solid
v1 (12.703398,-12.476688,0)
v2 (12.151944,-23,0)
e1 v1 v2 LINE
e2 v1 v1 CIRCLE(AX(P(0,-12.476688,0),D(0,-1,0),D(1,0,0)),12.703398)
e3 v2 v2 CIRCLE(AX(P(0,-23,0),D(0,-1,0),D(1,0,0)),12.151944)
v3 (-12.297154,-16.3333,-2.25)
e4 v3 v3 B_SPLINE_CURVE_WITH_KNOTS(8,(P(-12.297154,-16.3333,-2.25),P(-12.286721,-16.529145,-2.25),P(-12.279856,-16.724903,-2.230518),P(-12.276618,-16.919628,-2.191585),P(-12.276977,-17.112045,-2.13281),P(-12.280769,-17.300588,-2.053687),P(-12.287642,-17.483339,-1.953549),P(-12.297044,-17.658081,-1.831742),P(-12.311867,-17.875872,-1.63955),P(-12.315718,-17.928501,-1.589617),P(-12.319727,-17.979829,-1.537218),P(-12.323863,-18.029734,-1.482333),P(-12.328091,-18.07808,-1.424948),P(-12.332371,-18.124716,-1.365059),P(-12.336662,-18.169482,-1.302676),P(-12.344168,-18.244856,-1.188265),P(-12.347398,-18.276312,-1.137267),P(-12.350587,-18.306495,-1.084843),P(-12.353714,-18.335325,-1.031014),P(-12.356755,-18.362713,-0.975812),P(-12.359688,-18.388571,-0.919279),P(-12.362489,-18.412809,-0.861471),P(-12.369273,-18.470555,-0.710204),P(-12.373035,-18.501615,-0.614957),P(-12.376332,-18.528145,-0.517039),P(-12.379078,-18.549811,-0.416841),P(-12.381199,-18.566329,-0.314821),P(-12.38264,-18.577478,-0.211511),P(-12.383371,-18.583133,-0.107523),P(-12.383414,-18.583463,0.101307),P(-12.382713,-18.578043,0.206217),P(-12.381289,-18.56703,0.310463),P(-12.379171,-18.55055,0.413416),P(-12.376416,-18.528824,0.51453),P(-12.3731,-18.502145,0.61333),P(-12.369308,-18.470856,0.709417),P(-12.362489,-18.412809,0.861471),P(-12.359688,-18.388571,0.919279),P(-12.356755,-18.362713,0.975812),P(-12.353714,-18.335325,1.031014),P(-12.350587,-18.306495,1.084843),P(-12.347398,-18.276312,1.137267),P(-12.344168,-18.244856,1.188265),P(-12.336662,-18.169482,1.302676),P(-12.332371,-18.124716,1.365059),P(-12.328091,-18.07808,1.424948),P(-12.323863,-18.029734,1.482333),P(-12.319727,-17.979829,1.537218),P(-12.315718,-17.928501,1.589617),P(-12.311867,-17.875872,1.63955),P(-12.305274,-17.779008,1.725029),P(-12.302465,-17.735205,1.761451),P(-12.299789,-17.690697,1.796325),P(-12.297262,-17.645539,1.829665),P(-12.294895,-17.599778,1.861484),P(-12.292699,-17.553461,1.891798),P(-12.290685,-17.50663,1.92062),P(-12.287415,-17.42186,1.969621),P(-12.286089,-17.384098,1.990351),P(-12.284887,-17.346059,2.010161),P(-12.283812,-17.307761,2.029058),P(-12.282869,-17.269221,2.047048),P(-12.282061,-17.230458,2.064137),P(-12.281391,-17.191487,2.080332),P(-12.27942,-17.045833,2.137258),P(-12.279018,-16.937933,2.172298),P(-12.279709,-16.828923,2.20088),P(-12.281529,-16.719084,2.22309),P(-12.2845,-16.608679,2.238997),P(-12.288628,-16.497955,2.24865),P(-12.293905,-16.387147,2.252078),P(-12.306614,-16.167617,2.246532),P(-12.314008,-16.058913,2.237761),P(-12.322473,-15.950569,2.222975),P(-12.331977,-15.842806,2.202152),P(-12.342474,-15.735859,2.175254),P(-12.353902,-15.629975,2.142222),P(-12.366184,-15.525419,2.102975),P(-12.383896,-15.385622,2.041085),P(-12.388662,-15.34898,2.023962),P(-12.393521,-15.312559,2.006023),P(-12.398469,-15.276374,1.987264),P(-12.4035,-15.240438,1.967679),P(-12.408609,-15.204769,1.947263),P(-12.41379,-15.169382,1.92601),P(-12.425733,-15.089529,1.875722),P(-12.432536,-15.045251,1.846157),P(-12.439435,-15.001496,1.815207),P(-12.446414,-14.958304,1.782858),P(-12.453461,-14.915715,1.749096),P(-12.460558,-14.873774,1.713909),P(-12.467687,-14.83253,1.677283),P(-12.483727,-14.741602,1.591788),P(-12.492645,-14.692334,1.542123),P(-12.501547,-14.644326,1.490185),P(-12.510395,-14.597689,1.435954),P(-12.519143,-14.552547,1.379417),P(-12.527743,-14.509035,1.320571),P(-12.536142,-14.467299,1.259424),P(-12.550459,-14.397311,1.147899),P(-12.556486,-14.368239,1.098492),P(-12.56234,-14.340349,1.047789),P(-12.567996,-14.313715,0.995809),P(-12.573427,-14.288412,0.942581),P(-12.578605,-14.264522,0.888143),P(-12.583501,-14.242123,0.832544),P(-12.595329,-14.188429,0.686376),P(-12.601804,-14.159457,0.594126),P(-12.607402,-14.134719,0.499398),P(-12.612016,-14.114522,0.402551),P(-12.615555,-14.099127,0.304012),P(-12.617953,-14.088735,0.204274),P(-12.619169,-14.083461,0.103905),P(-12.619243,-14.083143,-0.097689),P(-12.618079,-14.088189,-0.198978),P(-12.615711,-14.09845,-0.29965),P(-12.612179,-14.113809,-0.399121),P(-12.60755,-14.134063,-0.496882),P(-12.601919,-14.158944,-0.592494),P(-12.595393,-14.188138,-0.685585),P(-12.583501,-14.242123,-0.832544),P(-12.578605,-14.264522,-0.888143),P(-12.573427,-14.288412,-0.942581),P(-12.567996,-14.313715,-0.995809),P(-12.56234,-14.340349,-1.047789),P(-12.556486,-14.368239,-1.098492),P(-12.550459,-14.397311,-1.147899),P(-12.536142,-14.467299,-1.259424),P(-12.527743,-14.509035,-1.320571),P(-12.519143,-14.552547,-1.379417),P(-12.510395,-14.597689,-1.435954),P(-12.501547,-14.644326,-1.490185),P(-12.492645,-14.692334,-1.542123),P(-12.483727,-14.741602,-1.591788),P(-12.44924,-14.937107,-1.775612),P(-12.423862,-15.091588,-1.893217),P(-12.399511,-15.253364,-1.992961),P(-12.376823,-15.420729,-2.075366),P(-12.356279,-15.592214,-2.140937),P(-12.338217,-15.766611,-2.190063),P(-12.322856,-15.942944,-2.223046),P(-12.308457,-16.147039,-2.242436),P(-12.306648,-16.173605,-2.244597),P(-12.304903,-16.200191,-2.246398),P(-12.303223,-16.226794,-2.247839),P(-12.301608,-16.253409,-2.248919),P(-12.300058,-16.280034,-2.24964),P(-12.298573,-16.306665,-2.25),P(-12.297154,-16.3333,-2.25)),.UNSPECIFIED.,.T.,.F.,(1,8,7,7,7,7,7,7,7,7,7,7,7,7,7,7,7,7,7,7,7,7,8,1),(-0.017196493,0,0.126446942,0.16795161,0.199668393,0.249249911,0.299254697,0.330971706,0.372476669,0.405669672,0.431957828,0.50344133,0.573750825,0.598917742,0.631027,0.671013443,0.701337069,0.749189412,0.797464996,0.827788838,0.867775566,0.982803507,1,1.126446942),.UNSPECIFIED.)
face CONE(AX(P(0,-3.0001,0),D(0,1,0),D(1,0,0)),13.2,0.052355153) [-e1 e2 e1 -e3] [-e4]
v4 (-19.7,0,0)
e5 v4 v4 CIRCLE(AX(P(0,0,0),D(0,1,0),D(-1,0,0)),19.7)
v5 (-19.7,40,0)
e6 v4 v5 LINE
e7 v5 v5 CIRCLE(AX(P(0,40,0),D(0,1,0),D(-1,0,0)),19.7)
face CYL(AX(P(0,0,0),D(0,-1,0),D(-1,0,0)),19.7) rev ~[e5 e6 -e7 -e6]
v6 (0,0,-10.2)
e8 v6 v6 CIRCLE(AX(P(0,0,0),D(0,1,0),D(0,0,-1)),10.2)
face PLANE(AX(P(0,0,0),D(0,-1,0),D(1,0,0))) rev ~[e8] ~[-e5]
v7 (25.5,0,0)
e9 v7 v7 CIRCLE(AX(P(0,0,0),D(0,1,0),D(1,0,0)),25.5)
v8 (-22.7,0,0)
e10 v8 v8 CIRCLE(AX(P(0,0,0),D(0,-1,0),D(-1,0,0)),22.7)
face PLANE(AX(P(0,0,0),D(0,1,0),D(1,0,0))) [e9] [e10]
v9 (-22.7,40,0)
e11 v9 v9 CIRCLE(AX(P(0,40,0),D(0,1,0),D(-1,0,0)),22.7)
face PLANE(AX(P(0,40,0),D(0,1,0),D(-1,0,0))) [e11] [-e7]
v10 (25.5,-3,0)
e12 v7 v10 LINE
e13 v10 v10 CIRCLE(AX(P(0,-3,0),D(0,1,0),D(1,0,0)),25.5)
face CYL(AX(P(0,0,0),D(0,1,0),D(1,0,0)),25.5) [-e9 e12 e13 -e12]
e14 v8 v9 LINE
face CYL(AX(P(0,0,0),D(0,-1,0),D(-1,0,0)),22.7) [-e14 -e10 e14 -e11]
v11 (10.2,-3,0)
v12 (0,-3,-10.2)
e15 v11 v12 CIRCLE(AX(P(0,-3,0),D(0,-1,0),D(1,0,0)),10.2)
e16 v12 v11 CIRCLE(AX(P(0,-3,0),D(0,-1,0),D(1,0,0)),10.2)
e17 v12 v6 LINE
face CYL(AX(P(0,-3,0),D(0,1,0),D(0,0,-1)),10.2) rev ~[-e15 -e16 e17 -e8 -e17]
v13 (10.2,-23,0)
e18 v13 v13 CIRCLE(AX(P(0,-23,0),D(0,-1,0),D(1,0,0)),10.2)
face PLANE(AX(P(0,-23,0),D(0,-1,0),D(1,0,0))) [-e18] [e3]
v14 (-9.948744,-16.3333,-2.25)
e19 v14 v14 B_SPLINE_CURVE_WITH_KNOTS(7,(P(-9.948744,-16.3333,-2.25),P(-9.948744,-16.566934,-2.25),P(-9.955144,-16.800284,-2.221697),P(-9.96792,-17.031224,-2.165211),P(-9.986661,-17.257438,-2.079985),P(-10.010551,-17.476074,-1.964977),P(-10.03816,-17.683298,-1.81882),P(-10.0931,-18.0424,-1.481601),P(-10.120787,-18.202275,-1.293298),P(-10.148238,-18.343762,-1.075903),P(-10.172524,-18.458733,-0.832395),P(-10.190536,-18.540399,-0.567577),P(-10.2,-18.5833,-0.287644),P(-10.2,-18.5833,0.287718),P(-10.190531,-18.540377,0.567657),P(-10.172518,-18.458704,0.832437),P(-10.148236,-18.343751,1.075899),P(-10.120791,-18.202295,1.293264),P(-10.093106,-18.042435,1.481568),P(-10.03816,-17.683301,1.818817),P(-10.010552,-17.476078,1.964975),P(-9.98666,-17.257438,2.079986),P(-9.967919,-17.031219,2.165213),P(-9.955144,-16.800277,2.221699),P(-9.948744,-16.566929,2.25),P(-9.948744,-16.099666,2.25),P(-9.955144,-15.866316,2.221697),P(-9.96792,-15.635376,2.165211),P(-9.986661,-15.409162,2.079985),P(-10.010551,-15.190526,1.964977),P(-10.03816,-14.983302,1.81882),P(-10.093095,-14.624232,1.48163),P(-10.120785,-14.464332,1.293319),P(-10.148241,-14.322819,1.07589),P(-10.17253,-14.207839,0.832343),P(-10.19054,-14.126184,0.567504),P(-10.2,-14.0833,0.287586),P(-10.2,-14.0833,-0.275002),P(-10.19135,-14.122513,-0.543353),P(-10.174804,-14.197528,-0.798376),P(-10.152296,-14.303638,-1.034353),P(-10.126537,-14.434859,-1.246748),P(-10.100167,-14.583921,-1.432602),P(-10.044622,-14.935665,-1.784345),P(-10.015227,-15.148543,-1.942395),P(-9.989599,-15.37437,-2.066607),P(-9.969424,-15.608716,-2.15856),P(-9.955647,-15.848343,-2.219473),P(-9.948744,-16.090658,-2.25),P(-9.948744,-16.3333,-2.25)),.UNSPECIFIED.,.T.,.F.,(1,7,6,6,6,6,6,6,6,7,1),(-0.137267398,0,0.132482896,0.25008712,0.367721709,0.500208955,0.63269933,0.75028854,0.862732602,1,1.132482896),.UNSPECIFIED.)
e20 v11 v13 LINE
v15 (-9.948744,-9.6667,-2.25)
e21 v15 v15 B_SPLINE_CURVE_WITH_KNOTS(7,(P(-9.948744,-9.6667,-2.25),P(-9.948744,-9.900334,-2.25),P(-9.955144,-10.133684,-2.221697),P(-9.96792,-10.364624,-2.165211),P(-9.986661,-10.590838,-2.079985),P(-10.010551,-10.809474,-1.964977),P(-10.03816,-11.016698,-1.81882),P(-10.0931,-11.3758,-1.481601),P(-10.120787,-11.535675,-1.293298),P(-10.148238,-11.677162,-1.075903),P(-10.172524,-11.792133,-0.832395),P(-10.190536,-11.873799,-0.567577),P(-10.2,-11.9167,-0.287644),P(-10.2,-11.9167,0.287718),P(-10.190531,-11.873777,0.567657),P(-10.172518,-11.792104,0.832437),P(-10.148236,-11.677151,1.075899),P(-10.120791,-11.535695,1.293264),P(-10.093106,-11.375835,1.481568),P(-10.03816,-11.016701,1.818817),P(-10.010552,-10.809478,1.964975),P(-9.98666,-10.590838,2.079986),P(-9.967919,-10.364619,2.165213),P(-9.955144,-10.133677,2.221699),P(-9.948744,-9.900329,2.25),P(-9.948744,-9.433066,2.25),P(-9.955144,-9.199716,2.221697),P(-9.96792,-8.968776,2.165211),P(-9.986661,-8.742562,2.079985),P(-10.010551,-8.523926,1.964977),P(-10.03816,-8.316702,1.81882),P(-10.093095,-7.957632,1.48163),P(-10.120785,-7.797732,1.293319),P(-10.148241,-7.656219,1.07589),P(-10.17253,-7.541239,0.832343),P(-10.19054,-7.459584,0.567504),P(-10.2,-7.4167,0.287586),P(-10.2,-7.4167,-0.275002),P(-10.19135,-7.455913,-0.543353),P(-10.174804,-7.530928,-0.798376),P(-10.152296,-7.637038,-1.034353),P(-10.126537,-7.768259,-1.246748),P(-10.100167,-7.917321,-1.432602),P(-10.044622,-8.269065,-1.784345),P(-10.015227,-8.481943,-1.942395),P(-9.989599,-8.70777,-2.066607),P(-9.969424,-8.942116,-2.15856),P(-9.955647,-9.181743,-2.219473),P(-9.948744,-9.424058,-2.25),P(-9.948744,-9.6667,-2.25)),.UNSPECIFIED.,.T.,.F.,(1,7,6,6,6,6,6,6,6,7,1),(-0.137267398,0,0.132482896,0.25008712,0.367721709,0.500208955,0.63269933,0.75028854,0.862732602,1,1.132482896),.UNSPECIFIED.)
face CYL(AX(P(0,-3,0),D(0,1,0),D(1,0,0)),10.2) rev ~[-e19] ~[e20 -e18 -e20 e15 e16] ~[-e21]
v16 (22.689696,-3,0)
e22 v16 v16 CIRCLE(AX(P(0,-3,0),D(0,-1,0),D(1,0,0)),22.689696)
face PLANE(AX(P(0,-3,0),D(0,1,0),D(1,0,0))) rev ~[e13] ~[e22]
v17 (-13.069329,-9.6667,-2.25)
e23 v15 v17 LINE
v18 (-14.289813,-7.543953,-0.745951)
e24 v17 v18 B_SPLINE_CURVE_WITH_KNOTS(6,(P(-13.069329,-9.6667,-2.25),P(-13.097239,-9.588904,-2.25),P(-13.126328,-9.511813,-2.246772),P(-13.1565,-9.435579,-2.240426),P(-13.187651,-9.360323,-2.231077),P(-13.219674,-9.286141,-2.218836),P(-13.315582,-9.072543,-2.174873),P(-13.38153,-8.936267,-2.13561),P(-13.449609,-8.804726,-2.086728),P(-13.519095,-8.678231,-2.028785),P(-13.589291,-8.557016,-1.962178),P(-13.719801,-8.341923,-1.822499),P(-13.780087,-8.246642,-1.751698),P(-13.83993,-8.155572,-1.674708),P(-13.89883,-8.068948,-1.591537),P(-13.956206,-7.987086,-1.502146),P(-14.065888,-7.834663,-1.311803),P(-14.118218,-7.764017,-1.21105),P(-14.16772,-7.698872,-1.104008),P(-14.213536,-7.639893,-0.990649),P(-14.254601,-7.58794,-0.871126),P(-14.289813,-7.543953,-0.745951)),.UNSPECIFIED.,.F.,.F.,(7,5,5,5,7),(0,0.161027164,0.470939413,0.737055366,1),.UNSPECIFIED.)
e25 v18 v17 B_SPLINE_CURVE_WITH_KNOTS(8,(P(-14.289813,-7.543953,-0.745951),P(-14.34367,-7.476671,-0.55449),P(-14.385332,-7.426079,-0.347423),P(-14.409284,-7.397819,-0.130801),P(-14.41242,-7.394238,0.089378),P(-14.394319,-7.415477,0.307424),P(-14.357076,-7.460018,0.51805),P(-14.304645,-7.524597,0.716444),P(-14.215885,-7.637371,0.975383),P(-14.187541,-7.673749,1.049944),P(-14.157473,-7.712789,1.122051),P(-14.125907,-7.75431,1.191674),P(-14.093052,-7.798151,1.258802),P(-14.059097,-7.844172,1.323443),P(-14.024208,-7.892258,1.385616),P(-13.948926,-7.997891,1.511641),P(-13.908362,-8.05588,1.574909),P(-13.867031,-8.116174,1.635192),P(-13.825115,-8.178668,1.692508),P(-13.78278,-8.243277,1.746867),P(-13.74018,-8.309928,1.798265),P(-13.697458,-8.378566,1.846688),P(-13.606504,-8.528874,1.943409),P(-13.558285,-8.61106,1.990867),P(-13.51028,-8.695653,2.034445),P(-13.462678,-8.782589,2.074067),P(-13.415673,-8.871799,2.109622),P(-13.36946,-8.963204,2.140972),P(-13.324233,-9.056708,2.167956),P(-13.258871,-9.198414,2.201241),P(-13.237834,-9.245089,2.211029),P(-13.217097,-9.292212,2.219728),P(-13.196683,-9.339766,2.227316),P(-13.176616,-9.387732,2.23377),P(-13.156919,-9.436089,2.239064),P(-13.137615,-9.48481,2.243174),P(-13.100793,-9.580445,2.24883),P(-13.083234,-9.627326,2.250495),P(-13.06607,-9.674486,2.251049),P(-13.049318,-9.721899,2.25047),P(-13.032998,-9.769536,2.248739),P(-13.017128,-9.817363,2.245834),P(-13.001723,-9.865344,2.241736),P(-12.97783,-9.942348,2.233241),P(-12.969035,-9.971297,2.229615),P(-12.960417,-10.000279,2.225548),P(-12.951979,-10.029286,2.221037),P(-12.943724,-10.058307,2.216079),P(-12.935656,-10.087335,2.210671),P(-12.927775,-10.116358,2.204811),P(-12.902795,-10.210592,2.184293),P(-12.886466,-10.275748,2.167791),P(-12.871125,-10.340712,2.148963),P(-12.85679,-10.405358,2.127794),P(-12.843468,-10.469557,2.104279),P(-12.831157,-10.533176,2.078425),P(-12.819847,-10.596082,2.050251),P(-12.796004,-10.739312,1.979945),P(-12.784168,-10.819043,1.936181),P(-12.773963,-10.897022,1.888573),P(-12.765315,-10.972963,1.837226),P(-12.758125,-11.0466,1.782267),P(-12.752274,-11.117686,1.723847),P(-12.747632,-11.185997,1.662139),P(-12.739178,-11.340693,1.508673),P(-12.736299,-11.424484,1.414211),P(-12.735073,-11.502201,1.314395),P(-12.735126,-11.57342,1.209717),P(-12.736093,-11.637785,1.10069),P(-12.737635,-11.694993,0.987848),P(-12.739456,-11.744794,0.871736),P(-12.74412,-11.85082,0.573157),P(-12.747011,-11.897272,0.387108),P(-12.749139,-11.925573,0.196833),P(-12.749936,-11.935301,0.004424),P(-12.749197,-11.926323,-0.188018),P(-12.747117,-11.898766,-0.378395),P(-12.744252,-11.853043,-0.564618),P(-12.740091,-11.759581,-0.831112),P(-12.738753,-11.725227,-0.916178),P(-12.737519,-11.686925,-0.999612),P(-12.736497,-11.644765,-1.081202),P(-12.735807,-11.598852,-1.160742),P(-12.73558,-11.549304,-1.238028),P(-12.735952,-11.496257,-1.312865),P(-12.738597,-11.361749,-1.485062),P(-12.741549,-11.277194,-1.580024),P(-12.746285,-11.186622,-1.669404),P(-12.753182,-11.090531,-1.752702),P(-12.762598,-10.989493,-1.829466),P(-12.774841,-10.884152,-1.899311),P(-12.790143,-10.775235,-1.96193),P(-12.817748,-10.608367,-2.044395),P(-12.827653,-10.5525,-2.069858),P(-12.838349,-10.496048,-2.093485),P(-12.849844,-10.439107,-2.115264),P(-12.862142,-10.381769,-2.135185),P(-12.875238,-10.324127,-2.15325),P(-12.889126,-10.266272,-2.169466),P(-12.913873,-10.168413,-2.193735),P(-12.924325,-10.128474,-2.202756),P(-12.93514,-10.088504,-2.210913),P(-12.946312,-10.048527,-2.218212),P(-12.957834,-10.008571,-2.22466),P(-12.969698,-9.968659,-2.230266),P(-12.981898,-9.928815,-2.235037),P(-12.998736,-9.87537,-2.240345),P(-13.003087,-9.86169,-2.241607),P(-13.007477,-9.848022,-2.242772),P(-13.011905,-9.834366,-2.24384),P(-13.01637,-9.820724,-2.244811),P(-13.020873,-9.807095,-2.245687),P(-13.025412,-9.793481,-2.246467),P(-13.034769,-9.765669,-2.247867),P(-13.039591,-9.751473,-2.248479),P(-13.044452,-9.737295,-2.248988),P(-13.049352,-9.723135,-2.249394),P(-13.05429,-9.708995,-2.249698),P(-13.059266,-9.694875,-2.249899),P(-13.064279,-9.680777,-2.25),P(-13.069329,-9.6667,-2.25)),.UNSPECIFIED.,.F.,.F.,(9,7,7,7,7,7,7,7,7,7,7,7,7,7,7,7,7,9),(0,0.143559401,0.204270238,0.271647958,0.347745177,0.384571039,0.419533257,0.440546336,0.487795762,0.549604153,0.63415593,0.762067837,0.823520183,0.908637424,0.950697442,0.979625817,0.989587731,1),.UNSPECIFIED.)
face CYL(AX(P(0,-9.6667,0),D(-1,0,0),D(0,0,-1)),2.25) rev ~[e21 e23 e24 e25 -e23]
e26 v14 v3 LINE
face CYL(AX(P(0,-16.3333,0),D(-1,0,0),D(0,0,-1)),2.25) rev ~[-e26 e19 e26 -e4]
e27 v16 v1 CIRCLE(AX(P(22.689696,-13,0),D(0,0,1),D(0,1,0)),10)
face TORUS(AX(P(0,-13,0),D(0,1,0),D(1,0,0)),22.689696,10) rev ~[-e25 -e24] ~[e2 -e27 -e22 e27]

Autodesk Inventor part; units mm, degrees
ref_plane "YZ Plane" through (0, 0, 0) normal (1, 0, 0) x (0, 1, 0)
ref_plane "XZ Plane" through (0, 0, 0) normal (0, 1, 0) x (-1, 0, 0)
ref_plane "XY Plane" through (0, 0, 0) normal (0, 0, 1) x (1, 0, 0)
sketch "Boceto1" plane through (0, 0, 0) normal (0, 1, 0) x (-1, 0, 0)
  circle A0 centre (0, 0) radius 19.7
  circle A1 centre (0, 0) radius 22.7
  dimension "d0" = 39.4
  dimension "d1" = 45.4
extrude "Extrusión1" add sketch "Boceto1" along normal blind 40
sketch "Boceto2" plane through (0, 0, 0) normal (0, -1, 0) x (1, 0, 0)
  circle A0 centre (0, 0) radius 22.7 projected
  circle A1 centre (0, 0) radius 19.7 projected
extrude "Extrusión2" add sketch "Boceto2" along normal blind 3 contours A0 | A1
sketch "Boceto3" plane through (0, -3, 0) normal (0, -1, 0) x (1, 0, 0)
  circle A0 centre (0, 0) radius 10.2
  circle A1 centre (0, 0) radius 13.2
  dimension "d6" = 20.4
  dimension "d7" = 26.4
extrude "Extrusión3" add sketch "Boceto3" along normal blind 20
chamfer "Chaflán1" distance 20 angle 3 1 edges at (-13.2, -23, 0) measured on face at (13.0291, -16.3333, -2.1174)
fillet "Empalme1" radius 10 2 edges at (-13.2, -3.0001, 0) (-13.2, -3, 0)
sketch "Boceto4" plane through (0, -3, 0) normal (0, -1, 0) x (1, 0, 0)
  circle A0 centre (0, 0) radius 10.2 projected
hole "Agujero1" at (0, -3, 0) direction (0, 1, 0) diameter 20.4 end through all
sketch "Boceto5" plane through (0, 0, 0) normal (1, 0, 0) x (0, 1, 0)
  line L0 (-23, -12.1518) -> (-23, 12.1518) projected
  line L1 (-12.4766, -12.7034) -> (-12.4766, 12.7034) projected
  line L2 (-12.4766, -12.7034) -> (-12.4766, 12.7034) projected
  line L3 (-3, 22.6896) -> (-3, -22.6896) projected
  line L4 (-23, -10.2) -> (-23, 10.2) projected
  line L5 (-23, 0) -> (-3, 0)
  line L6 (-3, 22.7) -> (-3, -22.7) projected
  line L7 (-23, 0) -> (-16.3333, 0)
  line L8 (-16.3333, 0) -> (-9.6667, 0)
  circle A0 centre (-16.3333, 0) radius 2.25
  circle A1 centre (-9.6667, 0) radius 2.25
  point P0 (0, 0)
  dimension "d21" = 6.6667
  dimension "d22" = 6.6667
  dimension "d23" = 4.5
  dimension "d24" = 4.5
hole "Agujero2" at (0, -16.3333, 0) at (0, -9.6667, 0) direction (-1, 0, 0) diameter 4.5 end through all
sketch "Boceto6" plane through (0, 0, 0) normal (0, 1, 0) x (1, 0, 0)
  circle A0 centre (0, 0) radius 25.5
  circle A1 centre (0, 0) radius 22.7 projected
  circle A2 centre (0, 0) radius 19.7 projected
  dimension "d32" = 51
extrude "Extrusión4" add sketch "Boceto6" against normal blind 3 contours A0
properties part number "SoporteBombilla"
